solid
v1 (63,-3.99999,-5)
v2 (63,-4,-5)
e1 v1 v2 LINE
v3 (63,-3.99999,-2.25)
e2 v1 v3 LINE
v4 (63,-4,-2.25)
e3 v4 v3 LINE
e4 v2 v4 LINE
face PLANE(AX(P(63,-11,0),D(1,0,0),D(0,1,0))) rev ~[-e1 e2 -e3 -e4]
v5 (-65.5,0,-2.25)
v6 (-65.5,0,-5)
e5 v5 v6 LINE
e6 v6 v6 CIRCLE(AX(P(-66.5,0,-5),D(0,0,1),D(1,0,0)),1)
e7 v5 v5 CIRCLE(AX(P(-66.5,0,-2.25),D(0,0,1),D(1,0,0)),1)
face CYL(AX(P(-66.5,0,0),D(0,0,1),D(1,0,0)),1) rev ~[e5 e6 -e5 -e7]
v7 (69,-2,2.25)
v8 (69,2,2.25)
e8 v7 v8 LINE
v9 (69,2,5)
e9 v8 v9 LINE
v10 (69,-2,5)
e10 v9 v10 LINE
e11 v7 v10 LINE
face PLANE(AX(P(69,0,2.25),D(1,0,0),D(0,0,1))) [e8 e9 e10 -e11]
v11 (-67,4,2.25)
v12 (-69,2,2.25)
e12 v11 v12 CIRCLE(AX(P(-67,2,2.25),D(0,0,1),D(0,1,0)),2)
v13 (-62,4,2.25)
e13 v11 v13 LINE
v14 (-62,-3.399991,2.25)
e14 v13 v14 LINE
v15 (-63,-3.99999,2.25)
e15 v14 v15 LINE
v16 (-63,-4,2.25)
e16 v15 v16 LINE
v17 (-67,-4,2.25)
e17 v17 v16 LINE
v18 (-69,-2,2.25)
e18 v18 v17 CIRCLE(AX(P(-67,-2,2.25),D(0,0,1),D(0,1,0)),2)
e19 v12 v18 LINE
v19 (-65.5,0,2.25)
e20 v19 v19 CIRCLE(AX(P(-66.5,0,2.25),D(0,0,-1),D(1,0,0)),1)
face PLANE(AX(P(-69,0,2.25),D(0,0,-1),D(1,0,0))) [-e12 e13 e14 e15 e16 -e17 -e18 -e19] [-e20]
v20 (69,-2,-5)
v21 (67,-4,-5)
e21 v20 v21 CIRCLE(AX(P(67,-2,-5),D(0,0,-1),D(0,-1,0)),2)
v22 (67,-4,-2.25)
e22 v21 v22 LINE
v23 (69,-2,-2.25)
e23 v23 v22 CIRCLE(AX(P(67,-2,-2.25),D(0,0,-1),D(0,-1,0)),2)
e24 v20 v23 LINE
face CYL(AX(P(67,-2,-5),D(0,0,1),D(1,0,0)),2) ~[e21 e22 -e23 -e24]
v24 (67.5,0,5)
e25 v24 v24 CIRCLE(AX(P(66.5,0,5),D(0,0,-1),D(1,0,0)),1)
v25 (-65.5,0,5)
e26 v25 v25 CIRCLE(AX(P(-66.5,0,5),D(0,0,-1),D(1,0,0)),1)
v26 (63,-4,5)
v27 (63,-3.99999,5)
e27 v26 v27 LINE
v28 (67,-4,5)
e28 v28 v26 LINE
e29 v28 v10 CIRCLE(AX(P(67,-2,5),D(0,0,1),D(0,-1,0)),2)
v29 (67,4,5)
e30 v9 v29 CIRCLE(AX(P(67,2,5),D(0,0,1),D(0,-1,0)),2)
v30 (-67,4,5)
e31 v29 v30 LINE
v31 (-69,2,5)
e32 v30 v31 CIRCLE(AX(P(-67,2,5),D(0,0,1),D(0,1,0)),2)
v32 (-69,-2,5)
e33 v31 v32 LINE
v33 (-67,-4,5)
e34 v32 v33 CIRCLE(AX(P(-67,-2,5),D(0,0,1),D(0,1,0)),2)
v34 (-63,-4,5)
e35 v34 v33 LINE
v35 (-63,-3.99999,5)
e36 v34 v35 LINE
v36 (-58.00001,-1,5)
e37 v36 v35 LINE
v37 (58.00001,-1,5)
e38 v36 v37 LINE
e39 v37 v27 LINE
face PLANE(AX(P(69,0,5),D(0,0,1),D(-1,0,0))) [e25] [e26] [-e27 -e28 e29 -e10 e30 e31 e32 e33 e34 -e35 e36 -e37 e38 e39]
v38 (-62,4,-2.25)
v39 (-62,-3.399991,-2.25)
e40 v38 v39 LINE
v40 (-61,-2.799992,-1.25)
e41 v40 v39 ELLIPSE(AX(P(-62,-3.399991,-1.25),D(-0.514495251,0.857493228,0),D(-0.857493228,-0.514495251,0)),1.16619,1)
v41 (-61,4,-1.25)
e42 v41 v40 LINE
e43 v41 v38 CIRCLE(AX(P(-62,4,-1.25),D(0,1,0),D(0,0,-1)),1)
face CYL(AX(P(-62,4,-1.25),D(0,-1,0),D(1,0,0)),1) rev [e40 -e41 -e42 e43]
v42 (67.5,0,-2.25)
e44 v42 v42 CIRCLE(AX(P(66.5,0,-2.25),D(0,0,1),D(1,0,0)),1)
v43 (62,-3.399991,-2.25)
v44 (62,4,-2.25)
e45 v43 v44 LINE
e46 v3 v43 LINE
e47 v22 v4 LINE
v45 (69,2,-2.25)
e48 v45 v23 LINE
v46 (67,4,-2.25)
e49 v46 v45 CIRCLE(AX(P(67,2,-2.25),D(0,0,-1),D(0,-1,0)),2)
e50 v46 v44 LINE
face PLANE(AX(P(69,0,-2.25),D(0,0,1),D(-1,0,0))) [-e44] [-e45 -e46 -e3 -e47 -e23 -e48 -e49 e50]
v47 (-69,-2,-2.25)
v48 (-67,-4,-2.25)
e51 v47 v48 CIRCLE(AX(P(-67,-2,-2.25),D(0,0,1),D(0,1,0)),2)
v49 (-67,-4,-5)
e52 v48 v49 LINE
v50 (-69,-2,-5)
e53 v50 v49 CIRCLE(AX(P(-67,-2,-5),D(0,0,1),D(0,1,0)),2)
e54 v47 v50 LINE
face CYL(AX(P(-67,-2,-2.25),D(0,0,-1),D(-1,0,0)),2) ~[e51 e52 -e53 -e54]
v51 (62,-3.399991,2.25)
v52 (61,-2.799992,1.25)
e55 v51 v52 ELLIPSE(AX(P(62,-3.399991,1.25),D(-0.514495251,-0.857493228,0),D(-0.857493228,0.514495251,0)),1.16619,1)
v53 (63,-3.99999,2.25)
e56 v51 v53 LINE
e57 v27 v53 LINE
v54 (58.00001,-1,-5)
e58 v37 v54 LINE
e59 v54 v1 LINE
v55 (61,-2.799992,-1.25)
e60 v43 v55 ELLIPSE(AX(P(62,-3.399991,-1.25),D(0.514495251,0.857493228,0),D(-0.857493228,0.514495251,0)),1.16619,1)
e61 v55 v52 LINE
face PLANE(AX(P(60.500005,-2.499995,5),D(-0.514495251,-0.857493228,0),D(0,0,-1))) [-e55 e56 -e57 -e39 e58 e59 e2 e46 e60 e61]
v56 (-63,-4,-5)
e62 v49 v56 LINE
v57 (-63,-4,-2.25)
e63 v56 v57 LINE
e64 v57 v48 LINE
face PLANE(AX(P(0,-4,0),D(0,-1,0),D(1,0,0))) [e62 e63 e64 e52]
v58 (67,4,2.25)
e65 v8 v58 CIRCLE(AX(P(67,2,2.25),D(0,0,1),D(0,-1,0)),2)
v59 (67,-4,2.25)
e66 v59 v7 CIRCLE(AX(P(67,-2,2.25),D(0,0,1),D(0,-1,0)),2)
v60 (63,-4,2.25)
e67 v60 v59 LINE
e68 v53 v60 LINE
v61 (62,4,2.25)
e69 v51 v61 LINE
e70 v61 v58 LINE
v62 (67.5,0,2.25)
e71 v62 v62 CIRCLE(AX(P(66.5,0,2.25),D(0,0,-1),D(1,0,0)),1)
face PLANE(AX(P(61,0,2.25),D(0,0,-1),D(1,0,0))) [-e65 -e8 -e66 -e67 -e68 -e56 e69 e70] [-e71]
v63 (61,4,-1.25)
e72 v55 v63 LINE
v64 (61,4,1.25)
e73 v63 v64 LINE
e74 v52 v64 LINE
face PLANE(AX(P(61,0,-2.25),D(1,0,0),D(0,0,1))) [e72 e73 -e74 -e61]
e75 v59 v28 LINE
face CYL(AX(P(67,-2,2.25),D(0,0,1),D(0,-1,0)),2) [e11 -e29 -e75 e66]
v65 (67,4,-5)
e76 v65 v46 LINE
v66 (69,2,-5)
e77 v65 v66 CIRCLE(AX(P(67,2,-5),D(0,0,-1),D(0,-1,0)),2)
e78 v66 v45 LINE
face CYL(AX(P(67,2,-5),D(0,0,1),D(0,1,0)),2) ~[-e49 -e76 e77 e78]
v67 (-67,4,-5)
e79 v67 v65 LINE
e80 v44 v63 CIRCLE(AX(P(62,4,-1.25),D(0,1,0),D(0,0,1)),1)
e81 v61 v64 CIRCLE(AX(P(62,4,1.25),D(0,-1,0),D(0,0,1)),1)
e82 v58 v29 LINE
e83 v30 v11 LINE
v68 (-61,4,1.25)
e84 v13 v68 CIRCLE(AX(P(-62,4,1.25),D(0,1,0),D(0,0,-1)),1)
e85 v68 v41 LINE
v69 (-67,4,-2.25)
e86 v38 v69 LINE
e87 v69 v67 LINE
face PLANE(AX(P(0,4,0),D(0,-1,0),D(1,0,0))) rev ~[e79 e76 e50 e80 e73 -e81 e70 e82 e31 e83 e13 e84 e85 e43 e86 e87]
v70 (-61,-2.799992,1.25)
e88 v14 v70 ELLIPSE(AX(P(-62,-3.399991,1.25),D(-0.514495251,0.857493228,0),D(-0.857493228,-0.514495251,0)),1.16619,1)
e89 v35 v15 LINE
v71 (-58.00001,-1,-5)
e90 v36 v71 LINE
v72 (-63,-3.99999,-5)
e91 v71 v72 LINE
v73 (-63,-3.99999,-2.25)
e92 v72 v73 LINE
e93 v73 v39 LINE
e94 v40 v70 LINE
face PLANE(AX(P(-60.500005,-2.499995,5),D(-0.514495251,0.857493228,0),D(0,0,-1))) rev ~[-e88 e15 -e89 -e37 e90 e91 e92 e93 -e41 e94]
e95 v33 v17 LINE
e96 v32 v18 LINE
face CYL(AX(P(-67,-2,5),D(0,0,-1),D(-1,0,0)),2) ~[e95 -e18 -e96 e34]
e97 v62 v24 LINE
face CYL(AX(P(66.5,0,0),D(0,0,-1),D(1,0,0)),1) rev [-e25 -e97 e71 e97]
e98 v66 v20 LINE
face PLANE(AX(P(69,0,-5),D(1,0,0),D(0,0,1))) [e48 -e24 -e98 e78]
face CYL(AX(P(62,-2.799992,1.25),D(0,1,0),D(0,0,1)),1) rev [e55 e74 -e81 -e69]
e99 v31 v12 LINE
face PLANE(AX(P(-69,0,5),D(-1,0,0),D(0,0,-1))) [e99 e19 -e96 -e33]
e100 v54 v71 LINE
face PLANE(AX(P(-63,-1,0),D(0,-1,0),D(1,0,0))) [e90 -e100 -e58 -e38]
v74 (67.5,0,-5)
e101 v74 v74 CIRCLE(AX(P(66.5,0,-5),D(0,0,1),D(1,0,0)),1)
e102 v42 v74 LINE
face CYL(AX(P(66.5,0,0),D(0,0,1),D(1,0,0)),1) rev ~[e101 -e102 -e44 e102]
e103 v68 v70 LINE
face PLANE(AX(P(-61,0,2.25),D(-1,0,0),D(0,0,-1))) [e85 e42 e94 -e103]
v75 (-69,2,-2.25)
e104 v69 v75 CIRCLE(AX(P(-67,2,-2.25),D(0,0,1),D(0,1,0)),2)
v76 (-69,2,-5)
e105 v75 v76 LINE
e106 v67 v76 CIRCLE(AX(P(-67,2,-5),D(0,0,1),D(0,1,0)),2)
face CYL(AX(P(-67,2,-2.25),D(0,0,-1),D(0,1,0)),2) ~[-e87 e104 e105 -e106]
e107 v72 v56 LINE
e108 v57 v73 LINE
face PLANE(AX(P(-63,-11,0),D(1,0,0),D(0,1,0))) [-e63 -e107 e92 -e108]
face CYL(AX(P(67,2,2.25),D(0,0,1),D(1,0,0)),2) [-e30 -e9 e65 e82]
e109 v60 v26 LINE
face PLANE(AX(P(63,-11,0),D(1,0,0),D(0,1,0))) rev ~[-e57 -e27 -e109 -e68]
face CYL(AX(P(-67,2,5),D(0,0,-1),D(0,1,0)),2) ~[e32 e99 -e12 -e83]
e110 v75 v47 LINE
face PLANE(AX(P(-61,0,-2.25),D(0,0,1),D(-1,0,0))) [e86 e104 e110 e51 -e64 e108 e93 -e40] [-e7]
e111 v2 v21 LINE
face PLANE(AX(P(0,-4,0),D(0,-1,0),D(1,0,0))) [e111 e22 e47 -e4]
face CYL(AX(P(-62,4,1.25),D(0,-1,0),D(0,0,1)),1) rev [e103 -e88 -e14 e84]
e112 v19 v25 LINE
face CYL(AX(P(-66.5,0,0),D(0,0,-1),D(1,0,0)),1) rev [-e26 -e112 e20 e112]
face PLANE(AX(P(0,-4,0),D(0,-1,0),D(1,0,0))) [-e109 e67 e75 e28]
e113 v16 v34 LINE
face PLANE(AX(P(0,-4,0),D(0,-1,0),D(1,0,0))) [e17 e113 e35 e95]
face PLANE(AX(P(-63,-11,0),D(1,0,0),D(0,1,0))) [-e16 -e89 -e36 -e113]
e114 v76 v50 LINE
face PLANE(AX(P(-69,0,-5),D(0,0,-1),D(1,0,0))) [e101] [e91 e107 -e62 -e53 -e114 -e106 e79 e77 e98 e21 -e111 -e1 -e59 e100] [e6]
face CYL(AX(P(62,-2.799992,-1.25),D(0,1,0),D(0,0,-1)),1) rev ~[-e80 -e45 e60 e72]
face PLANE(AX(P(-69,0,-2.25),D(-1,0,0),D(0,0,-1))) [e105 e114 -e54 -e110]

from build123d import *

# Parameters (mm, degrees)
F1_DEPTH      = 4
F2_R          = 1
F3_DEPTH      = 5.001
F3_DEPTH_BACK = 5.001
F4_W          = 126
F4_H          = 10
F5_DEPTH      = 10
F6_SIZE2      = 2.99999
F6_SIZE       = 4.99999
F7_R          = 2
F8_R          = 1


# Not quite as in the source:
# - a fillet or chamfer is up to 0.001 mm smaller than in the source, because OpenCascade refuses the exact size


with BuildPart() as f1:
    # F0 (on Front) → F1 (new body, symmetric)
    with BuildSketch(Plane.XZ):
        Polygon((69, 2.25), (69, 5), (-69, 5), (-69, 2.25), (-61, 2.25), (-61, -2.25), (-69, -2.25), (-69, -5), (69, -5), (69, -2.25), (61, -2.25), (61, 2.25), align=None)
    extrude(amount=F1_DEPTH, both=True)

    # F2 (on Top) → F3 (cut, two sides)
    with BuildSketch(Plane.XY) as f3_sk:
        with Locations((-66.5, 0)):
            Circle(F2_R)
        with Locations((66.5, 0)):
            Circle(F2_R)
    extrude(amount=-F3_DEPTH, mode=Mode.SUBTRACT)
    extrude(f3_sk.sketch, amount=F3_DEPTH_BACK, mode=Mode.SUBTRACT)

    # F4 (on Top) → F5 (cut, symmetric)
    with BuildSketch(Plane.XY):
        with Locations((0, -6)):
            Rectangle(F4_W, F4_H)
    extrude(amount=F5_DEPTH, both=True, mode=Mode.SUBTRACT)

    # F6 (size 5 and 3 in the source; OpenCascade refuses exactly that, so slightly less here)
    f6_edges = [f1.edges().sort_by_distance(p)[0] for p in [
        (-63, -1, 3.625),
        (63, -1, 3.625),
    ]]
    f6_side = f1.faces().sort_by_distance((0, -1, 0))[0]
    chamfer(f6_edges, length=F6_SIZE, length2=F6_SIZE2, reference=f6_side)

    # F7
    f7_edges = [f1.edges().sort_by_distance(p)[0] for p in [
        (-69, 4, 3.625),
        (-69, 4, -3.625),
        (-69, -4, 3.625),
        (-69, -4, -3.625),
        (69, -4, 3.625),
        (69, -4, -3.625),
        (69, 4, -3.625),
        (69, 4, 3.625),
    ]]
    fillet(f7_edges, radius=F7_R)

    # F8
    f8_edges = [f1.edges().sort_by_distance(p)[0] for p in [
        (61, 0.600004, -2.25),
        (61, 0.600004, 2.25),
        (-61, 0.600004, 2.25),
        (-61, 0.600004, -2.25),
    ]]
    fillet(f8_edges, radius=F8_R)


solid = f1.part
